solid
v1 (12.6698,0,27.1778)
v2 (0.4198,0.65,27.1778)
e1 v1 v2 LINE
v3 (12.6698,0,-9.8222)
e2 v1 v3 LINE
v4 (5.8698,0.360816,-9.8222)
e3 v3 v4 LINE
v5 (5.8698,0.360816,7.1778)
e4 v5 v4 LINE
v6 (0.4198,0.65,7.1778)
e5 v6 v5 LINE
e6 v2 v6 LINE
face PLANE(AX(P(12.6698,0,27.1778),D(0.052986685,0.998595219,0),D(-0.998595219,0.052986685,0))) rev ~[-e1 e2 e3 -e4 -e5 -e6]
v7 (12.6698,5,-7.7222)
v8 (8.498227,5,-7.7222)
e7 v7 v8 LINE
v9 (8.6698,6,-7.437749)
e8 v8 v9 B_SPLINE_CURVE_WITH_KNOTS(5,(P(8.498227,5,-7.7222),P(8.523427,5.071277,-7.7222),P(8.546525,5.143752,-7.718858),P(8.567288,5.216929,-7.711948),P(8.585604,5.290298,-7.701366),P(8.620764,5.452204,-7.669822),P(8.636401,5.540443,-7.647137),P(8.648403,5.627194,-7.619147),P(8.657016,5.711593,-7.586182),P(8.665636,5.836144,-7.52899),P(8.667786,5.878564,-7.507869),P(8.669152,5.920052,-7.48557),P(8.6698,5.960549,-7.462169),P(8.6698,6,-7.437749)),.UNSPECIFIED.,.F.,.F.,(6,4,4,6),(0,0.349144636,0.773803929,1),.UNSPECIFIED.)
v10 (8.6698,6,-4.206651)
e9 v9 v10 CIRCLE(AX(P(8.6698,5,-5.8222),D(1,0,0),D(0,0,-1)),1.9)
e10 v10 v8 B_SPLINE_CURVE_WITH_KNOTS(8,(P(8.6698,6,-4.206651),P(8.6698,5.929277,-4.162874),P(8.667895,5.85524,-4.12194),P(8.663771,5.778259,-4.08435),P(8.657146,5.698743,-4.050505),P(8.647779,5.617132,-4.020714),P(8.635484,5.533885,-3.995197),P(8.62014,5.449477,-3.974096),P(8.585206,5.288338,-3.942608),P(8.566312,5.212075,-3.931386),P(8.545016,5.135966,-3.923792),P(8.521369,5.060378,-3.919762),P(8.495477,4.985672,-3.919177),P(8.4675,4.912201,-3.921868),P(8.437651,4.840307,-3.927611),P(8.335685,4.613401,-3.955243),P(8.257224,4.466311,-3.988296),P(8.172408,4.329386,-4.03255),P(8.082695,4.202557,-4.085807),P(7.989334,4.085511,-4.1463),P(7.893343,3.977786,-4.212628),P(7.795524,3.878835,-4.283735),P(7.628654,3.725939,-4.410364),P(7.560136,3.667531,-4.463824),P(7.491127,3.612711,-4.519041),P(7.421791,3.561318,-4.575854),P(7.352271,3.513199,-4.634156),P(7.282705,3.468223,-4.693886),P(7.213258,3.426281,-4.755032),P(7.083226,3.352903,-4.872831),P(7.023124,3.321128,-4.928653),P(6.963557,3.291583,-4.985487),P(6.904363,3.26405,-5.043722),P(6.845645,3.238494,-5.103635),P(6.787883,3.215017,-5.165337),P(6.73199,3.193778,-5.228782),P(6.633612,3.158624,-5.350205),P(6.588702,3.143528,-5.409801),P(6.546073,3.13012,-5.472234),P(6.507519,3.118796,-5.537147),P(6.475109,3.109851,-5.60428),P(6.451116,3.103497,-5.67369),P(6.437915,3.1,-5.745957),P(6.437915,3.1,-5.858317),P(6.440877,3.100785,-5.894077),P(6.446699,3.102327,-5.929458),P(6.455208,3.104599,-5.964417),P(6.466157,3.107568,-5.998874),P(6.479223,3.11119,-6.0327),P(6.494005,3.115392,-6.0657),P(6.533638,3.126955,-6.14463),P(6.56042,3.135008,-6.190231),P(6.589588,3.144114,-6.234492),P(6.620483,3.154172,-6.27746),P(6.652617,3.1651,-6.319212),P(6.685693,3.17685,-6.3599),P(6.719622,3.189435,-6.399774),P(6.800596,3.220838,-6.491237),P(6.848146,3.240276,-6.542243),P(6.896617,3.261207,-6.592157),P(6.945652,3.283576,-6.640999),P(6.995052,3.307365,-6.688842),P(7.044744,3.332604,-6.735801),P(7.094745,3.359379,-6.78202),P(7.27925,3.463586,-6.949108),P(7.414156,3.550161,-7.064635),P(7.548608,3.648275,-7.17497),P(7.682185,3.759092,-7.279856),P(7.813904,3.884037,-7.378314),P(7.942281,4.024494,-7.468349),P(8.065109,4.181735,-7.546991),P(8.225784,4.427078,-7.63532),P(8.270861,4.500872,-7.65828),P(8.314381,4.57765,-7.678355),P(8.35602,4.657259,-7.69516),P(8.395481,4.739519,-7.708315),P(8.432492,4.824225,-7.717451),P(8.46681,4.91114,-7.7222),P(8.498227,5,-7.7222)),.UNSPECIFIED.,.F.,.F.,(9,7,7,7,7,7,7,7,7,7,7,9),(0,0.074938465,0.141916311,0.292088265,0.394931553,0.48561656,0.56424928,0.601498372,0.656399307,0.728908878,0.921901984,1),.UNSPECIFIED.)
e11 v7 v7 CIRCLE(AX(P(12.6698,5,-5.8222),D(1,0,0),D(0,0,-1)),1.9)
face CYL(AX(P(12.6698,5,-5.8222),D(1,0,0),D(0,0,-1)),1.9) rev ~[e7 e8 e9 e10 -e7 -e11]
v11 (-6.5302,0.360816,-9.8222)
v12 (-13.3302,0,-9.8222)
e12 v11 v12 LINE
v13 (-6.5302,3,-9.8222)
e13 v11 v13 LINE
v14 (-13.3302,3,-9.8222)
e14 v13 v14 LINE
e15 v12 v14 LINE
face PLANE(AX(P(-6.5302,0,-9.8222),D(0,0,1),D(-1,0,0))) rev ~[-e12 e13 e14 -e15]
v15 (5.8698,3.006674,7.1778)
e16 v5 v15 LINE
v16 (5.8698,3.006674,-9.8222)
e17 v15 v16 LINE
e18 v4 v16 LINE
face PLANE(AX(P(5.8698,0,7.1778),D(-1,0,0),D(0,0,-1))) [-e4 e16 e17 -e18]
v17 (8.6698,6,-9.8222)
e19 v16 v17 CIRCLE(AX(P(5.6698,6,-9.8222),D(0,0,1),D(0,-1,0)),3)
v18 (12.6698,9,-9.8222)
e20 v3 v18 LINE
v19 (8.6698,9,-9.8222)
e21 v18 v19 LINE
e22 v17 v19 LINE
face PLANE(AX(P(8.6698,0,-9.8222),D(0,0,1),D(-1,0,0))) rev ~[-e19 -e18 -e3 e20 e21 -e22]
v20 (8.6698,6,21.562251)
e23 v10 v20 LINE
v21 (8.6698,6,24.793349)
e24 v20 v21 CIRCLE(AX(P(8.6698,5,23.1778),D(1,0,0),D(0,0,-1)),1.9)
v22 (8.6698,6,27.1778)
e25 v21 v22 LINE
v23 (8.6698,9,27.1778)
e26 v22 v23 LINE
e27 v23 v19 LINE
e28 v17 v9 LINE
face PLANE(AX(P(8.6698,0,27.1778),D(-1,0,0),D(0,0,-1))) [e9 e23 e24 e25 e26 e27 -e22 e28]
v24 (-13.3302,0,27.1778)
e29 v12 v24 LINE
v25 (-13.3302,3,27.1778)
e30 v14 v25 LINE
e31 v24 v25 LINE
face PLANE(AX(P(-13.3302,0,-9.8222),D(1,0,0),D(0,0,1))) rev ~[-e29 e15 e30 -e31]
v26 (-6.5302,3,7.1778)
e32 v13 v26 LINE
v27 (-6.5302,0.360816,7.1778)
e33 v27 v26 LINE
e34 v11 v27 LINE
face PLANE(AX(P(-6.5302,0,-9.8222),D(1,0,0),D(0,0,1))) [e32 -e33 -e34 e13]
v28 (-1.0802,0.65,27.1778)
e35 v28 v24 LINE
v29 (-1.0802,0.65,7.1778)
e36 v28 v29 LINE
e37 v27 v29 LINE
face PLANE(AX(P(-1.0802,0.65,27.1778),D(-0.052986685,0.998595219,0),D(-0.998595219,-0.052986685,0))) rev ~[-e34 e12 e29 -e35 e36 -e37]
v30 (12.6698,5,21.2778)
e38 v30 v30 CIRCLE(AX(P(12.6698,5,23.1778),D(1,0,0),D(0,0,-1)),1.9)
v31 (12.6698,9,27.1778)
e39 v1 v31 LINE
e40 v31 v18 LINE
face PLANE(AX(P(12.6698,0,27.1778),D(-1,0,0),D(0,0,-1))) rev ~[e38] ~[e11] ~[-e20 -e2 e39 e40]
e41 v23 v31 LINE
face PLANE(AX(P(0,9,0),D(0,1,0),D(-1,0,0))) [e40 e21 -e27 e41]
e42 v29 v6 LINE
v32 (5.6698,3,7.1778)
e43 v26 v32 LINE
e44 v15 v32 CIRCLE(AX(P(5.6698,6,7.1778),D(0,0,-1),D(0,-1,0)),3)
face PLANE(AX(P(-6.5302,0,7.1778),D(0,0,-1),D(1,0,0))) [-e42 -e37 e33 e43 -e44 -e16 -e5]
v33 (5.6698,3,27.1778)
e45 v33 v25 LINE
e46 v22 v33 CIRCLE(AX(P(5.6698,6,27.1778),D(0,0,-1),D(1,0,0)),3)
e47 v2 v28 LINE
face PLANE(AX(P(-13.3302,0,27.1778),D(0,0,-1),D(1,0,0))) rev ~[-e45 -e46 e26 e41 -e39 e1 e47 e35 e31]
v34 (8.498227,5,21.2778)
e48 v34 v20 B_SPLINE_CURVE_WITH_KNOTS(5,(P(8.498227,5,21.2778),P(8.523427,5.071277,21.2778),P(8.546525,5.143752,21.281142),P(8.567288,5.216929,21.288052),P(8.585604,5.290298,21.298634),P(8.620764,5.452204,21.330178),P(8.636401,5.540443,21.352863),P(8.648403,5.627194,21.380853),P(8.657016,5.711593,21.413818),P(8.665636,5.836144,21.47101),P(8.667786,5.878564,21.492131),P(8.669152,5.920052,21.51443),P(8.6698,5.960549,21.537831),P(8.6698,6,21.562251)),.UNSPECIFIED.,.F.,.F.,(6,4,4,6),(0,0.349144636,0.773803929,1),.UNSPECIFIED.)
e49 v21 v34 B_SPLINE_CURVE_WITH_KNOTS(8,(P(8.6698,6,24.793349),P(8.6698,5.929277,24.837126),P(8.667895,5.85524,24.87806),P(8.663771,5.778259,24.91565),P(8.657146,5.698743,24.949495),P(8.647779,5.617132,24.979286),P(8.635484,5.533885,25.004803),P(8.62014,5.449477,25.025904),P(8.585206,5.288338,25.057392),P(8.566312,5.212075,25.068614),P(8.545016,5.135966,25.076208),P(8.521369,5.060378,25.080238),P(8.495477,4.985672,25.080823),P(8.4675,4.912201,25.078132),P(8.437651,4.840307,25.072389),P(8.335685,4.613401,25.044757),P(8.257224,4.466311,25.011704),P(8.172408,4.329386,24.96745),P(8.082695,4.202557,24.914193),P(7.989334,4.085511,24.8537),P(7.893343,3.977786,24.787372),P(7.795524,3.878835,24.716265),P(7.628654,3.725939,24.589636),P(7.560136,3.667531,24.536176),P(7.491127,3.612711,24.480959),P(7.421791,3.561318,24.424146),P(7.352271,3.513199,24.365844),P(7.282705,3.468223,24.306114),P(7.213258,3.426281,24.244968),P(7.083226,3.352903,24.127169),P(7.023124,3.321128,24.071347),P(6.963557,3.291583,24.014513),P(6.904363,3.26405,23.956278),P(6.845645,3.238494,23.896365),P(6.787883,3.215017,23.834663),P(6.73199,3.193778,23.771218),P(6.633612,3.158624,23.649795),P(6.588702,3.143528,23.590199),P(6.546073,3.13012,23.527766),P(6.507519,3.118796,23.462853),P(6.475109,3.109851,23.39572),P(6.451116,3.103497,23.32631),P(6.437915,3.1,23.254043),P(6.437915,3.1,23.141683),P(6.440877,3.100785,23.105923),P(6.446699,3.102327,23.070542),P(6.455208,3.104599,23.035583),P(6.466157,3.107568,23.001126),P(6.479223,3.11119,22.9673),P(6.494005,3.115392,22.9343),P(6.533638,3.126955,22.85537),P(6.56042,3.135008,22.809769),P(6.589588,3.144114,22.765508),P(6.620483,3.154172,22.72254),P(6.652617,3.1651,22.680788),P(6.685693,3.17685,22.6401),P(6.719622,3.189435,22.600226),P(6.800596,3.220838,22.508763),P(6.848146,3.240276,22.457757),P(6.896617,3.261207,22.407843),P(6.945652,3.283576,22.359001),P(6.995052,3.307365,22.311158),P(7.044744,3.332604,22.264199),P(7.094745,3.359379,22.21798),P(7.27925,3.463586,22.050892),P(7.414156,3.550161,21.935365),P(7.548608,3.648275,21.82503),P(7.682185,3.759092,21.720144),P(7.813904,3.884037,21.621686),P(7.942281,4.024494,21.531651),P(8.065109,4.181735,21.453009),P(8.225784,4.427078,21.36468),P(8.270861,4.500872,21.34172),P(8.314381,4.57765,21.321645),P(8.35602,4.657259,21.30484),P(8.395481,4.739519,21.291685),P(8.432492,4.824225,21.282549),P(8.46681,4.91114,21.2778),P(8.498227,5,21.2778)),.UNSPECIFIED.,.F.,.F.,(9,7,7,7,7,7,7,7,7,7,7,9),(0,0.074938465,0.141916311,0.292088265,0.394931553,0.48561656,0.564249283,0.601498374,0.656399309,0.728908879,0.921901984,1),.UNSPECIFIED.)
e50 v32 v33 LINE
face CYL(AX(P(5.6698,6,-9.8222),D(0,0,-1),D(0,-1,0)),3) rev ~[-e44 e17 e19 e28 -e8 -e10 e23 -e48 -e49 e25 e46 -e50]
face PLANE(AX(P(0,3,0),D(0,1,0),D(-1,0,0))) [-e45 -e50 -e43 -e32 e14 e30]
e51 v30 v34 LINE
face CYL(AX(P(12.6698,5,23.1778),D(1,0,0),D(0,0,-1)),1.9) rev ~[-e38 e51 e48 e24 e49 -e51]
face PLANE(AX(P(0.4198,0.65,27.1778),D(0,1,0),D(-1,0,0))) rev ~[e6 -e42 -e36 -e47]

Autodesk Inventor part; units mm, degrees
ref_plane "YZ Plane" through (0, 0, 0) normal (1, 0, 0) x (0, 1, 0)
ref_plane "XZ Plane" through (0, 0, 0) normal (0, 1, 0) x (-1, 0, 0)
ref_plane "XY Plane" through (0, 0, 0) normal (0, 0, 1) x (1, 0, 0)
sketch "Sketch1" plane through (0, 0, 0) normal (0, 1, 0) x (-1, 0, 0)
  line L0 (13.3302, 27.1778) -> (-12.6698, 27.1778)
  line L1 (-12.6698, 27.1778) -> (-12.6698, -9.8222)
  line L2 (-12.6698, -9.8222) -> (13.3302, -9.8222)
  line L3 (13.3302, -9.8222) -> (13.3302, 27.1778)
  line L4 (6.5302, 7.1778) -> (-5.8698, 7.1778)
  line L5 (-5.8698, 7.1778) -> (-5.8698, -9.8222)
  line L6 (-5.8698, -9.8222) -> (6.5302, -9.8222)
  line L7 (6.5302, -9.8222) -> (6.5302, 7.1778)
  line L8 (-12.6698, 27.1778) -> (-8.6698, 27.1778)
  line L9 (-8.6698, 27.1778) -> (-8.6698, -9.8222)
  line L10 (-8.6698, -9.8222) -> (-12.6698, -9.8222)
  line L11 (-12.6698, -9.8222) -> (-12.6698, 27.1778)
  point P0 (0, 0)
  dimension "d0" = 26
  dimension "d1" = 37
  dimension "d2" = 6.8
  dimension "d3" = 6.8
  dimension "d4" = 17
  dimension "d5" = 4
extrude "Extrusion1" add sketch "Sketch1" along normal blind 3 contours L3 L2 L7 L4 L5 L9 L0 | L9 L2 L1 L0
extrude "Extrusion2" add sketch "Sketch1" along normal blind 9 contours L9 L2 L1 L0
sketch "Sketch2" plane through (12.6698, 0, 27.1778) normal (1, 0, 0) x (0, 0, -1)
  circle A0 centre (4, 5) radius 1.9
  circle A1 centre (33, 5) radius 1.9
  line L0 (0, 0) -> (0, 9) projected
  line L1 (37, 0) -> (37, 9) projected
  line L2 (0, 0) -> (37, 0) projected
  point P0 (27.1778, 0)
  dimension "d10" = 3.8
  dimension "d11" = 3.8
  dimension "d12" = 4
  dimension "d13" = 4
  dimension "d14" = 4
  dimension "d15" = 4
  dimension "d27" = 5
  dimension "d28" = 29
extrude "Extrusion3" cut sketch "Sketch2" against normal blind 8
fillet "Fillet1" radius 3 1 edges at (8.6698, 3, 8.6778)
sketch "Sketch3" plane through (-13.3302, 0, 27.1778) normal (0, 0, 1) x (1, 0, 0)
  line L0 (26, 0) -> (13.75, 0.65)
  line L1 (12.25, 0.65) -> (0, 0)
  line L2 (0, 0) -> (26, 0)
  line L3 (0, 0) -> (26, 0) projected
  line L4 (0, 0) -> (0, 3) projected
  line L5 (26, 0) -> (26, 9) projected
  line L6 (13.75, 0.65) -> (12.25, 0.65)
  point P0 (13.3302, 0)
  dimension "d21" = 26
  dimension "d24" = 0.65
  dimension "d25" = 1.5
  dimension "d26" = 12.25
extrude "Extrusion4" cut sketch "Sketch3" against normal blind 40
equation "\"d26\" = 0.5 * d21 - 0.5 * d25"
properties part number "psu rear brace"
